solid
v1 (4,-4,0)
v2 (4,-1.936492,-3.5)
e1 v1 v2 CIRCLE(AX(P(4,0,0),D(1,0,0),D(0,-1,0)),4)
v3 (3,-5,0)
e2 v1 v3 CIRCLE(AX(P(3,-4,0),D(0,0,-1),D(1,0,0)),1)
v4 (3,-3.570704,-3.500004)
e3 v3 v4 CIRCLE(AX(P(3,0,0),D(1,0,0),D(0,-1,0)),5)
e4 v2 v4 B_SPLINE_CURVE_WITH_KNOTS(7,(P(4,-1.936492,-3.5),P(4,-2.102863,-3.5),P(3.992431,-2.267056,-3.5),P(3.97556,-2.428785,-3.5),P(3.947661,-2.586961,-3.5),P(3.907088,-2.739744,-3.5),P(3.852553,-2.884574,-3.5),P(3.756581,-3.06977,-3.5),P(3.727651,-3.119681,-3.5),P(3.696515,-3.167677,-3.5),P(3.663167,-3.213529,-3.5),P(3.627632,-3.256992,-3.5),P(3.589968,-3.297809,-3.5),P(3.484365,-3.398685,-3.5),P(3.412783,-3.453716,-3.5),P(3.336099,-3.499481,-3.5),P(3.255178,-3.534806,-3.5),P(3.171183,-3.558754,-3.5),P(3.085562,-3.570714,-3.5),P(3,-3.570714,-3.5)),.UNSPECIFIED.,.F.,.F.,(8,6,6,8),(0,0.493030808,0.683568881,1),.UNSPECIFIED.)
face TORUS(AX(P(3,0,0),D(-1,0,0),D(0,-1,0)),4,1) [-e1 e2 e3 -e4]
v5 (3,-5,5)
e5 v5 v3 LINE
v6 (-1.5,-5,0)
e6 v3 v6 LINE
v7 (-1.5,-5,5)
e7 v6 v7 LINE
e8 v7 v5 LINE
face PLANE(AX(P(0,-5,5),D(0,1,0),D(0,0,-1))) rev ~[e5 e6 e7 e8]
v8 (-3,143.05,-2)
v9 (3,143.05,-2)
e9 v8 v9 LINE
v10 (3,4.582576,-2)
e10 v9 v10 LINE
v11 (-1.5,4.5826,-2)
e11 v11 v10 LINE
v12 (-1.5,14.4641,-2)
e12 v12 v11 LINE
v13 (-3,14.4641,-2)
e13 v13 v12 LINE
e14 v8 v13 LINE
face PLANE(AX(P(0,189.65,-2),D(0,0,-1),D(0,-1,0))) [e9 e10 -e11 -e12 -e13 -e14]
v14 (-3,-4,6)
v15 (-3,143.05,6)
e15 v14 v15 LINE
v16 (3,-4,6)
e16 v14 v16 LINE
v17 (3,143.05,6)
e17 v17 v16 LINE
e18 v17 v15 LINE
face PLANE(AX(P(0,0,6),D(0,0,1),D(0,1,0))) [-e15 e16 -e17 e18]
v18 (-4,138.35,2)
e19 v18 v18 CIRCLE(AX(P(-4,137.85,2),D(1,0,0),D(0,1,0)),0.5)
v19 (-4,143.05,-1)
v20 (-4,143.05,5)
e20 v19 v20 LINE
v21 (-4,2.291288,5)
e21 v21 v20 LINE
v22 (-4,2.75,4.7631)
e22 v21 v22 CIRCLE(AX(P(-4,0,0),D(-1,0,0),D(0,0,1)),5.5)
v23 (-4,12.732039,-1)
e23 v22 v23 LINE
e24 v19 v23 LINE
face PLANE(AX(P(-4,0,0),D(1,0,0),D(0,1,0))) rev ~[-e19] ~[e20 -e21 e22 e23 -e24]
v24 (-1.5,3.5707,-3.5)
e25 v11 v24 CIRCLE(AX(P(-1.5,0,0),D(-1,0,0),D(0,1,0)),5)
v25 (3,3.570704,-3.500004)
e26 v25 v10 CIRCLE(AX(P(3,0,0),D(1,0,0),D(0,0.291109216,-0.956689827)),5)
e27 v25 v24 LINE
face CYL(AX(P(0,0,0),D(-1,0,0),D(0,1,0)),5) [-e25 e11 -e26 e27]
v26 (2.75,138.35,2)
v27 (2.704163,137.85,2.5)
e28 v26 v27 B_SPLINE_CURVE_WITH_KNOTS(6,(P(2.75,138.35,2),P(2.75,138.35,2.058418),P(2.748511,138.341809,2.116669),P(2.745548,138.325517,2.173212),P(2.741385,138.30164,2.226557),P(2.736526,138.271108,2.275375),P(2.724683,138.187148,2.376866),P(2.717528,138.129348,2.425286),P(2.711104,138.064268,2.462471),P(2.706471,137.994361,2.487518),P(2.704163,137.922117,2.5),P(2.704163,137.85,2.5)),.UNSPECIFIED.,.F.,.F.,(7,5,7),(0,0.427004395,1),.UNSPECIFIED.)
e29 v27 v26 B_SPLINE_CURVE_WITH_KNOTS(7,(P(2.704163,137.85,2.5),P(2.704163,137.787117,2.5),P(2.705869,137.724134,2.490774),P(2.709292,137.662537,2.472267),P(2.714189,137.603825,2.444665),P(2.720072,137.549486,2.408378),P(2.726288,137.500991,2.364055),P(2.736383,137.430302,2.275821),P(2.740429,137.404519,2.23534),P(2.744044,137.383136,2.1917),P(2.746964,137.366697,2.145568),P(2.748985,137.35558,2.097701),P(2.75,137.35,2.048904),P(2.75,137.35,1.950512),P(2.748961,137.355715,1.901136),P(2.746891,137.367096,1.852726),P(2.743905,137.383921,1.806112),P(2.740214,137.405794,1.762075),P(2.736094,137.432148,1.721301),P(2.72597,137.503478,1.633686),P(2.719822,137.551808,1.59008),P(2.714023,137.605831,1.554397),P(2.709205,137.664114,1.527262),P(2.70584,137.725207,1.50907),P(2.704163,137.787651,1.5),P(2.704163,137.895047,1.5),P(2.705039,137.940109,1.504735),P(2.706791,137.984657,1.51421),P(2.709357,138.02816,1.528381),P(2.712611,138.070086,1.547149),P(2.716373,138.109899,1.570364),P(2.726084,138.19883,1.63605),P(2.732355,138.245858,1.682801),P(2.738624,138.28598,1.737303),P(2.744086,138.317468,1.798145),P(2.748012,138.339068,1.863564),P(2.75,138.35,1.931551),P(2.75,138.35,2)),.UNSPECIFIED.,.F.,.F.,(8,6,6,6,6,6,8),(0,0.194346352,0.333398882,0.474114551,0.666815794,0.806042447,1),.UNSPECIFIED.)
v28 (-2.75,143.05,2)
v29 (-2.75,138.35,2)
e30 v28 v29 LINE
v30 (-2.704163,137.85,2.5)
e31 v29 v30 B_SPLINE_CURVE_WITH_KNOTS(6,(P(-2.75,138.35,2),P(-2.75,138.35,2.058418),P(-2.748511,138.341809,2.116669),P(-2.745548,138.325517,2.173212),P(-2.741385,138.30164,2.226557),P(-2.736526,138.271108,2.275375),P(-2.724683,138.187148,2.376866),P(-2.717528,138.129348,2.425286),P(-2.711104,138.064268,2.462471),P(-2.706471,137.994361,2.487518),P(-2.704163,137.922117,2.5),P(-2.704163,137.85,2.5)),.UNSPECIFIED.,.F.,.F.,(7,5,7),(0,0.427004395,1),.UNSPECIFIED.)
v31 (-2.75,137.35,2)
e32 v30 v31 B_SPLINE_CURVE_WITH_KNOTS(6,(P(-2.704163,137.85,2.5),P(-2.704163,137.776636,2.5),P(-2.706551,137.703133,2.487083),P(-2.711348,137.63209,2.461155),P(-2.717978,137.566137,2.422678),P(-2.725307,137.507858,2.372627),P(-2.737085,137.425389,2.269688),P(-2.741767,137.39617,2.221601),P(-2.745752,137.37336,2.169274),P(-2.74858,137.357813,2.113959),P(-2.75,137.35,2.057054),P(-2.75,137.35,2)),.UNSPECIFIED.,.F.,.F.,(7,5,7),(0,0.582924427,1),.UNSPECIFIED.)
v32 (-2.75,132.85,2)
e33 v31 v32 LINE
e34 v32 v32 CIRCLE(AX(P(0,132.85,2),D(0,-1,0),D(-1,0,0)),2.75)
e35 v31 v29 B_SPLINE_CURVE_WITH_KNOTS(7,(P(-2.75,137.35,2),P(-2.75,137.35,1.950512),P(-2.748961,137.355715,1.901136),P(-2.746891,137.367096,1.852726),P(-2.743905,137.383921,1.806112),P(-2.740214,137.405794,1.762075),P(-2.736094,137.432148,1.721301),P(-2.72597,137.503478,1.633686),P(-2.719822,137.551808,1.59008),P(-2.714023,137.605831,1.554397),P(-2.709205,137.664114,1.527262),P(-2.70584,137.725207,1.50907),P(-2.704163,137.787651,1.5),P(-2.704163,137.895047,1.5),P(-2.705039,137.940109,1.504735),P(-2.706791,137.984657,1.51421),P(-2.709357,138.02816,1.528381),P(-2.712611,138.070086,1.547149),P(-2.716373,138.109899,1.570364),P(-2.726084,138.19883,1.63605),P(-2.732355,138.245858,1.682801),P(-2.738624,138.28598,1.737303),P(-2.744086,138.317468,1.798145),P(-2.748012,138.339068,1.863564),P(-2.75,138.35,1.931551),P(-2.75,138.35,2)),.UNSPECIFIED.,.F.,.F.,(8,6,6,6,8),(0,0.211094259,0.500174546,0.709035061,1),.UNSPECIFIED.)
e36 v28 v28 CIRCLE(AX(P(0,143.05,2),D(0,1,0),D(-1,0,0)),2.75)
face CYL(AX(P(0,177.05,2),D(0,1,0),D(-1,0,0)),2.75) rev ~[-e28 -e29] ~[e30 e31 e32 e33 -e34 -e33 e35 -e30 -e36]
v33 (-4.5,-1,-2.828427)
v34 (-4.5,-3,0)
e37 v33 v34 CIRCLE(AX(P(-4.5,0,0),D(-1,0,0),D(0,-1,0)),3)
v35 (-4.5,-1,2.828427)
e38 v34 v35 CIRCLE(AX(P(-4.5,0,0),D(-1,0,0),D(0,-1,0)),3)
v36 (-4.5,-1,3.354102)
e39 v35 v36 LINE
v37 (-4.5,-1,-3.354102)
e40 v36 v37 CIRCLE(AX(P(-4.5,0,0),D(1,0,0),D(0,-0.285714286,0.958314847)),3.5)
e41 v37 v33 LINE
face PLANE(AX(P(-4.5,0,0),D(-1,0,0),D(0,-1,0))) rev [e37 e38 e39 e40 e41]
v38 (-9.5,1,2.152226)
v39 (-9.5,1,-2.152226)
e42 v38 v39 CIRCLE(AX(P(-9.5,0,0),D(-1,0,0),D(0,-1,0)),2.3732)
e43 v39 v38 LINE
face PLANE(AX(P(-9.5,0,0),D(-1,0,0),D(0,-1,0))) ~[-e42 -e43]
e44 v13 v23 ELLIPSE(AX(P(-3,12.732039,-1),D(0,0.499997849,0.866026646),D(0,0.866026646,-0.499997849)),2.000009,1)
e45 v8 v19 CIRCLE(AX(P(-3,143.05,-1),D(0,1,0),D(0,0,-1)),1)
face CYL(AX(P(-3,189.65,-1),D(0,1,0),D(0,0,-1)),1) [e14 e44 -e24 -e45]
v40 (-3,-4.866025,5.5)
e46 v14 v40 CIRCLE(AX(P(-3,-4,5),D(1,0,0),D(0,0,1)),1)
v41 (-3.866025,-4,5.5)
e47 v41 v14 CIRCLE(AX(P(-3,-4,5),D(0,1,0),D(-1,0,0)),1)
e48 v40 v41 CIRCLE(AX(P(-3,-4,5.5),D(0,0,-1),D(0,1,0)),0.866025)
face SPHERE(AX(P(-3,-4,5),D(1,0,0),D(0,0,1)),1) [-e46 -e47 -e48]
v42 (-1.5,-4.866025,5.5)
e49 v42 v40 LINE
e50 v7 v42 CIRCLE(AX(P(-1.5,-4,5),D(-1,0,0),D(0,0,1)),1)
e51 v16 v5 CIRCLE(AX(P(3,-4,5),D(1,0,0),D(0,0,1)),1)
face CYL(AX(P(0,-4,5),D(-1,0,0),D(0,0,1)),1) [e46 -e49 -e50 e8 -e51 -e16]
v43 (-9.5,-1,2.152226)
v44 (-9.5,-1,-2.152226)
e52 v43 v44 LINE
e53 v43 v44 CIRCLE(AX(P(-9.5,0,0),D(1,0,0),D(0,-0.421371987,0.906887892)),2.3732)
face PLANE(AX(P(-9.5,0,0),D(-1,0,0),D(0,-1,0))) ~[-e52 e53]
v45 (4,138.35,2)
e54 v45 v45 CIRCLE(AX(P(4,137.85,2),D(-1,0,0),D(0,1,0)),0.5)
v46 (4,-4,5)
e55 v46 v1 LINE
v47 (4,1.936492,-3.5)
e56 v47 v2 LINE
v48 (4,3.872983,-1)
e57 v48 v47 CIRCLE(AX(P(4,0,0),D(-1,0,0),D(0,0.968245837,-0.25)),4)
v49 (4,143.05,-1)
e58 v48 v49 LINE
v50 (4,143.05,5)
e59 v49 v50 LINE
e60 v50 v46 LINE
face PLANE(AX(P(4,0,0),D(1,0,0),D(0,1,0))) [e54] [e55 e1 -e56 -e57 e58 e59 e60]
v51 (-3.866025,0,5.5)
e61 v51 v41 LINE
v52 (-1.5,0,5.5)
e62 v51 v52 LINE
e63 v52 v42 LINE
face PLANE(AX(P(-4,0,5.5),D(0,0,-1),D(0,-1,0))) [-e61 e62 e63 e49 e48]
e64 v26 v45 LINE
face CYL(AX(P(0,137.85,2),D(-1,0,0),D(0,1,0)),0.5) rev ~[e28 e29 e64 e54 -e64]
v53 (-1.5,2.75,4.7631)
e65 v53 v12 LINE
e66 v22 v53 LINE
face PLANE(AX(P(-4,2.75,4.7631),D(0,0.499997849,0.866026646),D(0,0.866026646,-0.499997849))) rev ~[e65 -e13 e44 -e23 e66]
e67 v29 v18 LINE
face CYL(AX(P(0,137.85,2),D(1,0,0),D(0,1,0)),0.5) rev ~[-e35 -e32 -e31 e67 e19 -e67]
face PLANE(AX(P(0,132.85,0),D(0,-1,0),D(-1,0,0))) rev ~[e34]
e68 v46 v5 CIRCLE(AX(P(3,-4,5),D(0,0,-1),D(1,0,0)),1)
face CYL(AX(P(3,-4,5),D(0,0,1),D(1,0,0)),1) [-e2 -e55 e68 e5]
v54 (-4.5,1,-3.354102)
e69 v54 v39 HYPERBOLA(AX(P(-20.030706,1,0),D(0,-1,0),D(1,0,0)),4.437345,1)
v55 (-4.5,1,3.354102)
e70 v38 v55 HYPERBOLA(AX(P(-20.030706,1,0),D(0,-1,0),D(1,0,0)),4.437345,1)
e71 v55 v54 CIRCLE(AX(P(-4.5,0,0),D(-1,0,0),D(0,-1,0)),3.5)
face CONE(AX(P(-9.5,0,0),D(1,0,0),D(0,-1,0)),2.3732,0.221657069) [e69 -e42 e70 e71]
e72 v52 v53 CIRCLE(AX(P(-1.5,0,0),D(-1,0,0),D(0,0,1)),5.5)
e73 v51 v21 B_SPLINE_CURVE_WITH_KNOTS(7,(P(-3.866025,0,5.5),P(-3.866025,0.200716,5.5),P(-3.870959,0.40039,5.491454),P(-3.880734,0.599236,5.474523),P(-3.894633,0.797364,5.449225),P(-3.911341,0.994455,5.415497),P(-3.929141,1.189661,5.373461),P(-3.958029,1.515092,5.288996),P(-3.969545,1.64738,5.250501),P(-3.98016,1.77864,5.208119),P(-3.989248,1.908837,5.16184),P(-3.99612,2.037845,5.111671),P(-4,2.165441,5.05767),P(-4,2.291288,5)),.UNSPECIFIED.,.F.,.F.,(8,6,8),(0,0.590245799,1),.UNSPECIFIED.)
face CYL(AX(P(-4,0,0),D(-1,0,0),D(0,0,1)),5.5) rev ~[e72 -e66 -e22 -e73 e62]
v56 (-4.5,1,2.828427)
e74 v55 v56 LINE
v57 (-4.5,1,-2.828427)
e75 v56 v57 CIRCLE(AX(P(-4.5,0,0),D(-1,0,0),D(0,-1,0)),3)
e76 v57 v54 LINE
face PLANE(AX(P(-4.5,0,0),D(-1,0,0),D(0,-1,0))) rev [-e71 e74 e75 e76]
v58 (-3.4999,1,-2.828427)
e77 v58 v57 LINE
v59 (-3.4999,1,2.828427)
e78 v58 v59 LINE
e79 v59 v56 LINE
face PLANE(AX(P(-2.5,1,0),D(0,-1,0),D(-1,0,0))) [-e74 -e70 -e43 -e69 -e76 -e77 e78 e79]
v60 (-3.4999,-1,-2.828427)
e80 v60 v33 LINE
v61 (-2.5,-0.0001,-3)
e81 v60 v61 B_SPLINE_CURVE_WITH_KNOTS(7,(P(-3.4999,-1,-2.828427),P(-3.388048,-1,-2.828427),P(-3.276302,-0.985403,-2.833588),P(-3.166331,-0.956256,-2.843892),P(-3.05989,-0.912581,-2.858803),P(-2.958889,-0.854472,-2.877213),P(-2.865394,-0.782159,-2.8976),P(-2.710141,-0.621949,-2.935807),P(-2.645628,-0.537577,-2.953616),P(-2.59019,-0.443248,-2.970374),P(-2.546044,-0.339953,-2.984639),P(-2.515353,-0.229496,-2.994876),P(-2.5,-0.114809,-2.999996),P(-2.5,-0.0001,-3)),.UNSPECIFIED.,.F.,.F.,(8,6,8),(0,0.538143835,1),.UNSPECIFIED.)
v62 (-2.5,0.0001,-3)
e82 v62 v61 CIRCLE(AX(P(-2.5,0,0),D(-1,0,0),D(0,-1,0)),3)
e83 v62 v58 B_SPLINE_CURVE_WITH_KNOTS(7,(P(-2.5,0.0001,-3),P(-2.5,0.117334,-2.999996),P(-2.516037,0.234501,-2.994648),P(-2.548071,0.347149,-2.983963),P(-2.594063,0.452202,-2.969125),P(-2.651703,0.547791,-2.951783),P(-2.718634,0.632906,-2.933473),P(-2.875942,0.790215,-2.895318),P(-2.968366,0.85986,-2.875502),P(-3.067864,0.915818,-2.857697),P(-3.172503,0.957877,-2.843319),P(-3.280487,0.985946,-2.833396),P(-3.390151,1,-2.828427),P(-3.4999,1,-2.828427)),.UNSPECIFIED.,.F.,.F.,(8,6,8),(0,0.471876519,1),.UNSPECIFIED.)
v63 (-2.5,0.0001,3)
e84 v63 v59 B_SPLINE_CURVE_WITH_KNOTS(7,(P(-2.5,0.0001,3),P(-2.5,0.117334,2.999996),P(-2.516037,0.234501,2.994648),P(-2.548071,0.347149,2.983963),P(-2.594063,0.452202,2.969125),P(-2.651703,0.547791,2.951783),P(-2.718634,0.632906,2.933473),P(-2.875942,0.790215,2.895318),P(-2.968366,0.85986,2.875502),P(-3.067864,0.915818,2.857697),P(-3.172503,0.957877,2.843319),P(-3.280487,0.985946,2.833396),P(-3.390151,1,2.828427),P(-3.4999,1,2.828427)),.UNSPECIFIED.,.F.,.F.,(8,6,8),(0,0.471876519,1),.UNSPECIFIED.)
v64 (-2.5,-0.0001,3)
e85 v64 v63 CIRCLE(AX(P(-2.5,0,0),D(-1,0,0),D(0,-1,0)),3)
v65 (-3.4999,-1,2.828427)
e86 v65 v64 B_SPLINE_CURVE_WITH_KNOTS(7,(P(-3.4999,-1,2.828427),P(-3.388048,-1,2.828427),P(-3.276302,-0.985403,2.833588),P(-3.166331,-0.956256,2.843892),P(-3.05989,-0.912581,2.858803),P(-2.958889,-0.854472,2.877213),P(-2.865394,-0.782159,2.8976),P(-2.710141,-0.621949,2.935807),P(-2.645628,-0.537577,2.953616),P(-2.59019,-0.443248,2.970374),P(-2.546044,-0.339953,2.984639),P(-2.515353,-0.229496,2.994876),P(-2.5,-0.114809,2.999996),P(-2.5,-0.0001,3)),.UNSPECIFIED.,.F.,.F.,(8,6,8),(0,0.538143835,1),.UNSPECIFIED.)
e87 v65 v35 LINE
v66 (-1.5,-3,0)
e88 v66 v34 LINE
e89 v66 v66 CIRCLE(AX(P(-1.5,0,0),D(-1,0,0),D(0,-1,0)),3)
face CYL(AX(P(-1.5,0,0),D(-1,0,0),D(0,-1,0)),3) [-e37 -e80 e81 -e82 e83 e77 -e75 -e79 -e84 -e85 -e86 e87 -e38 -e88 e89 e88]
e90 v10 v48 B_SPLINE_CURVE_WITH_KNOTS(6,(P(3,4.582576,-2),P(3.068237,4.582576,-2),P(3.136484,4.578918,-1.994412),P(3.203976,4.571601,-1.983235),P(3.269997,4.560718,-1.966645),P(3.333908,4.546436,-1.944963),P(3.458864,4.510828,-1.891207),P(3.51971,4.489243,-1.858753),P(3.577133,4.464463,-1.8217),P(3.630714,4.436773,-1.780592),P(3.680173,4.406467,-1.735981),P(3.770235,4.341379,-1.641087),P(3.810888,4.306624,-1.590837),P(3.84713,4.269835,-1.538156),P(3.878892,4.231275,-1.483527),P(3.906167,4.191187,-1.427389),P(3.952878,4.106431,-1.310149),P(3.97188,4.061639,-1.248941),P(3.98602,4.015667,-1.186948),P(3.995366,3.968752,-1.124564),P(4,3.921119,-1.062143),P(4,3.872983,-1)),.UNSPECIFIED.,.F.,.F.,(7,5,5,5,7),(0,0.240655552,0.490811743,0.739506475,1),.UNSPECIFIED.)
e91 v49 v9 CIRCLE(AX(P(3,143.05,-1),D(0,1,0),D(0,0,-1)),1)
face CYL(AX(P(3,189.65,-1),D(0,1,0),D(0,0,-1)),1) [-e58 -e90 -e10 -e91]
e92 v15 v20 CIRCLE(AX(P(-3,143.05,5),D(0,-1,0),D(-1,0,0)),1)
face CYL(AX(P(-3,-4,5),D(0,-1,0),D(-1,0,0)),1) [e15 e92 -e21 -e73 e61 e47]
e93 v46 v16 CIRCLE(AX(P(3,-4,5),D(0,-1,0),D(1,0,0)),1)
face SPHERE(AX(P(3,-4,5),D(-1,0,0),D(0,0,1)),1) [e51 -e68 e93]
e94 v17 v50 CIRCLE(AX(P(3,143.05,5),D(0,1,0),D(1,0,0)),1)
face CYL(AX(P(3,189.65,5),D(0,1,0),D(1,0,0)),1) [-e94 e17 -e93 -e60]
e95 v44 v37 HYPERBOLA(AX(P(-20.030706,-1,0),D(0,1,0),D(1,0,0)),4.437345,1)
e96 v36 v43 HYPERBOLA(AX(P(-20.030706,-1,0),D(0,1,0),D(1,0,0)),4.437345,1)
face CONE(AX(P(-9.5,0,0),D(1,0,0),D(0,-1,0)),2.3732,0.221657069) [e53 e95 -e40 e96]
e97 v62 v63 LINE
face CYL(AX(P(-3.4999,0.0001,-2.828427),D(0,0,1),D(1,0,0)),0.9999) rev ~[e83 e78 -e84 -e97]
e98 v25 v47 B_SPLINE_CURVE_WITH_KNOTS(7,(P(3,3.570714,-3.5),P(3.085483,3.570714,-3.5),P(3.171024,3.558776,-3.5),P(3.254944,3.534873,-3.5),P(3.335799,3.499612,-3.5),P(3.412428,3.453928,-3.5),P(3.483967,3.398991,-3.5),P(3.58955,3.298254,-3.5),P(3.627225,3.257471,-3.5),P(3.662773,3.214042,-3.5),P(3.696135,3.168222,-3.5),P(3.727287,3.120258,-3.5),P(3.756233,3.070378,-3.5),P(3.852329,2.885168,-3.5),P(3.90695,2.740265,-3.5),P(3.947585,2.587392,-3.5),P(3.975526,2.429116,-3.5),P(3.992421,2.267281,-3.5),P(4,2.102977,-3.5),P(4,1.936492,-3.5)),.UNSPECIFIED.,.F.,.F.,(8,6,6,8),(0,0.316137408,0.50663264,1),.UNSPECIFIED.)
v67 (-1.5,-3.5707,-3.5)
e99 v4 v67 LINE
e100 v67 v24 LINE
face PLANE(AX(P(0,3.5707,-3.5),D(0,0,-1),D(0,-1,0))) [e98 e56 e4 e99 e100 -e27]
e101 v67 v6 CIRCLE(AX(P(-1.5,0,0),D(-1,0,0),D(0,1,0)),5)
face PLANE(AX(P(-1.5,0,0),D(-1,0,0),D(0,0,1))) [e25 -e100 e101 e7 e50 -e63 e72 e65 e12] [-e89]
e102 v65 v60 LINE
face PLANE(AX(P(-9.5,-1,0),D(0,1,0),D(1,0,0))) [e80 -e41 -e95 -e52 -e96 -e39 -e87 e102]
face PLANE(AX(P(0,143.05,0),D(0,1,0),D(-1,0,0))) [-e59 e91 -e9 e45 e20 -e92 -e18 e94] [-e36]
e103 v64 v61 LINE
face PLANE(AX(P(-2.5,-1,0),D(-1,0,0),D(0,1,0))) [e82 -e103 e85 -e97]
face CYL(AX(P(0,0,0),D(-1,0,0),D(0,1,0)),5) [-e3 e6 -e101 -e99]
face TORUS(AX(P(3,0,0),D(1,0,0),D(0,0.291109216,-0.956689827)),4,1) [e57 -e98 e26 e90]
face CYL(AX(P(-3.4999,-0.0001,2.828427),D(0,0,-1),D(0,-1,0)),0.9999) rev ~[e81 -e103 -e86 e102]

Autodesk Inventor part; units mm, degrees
ref_plane "YZ Plane" through (0, 0, 0) normal (1, 0, 0) x (0, 1, 0)
ref_plane "XY Plane" through (0, 0, 0) normal (0, 0, 1) x (1, 0, 0)
sketch "Boceto1" plane through (0, 0, 0) normal (1, 0, 0) x (0, 1, 0)
  circle A0 centre (0, 0) radius 5
  line L0 (0, 0) -> (0, 6)
  line L1 (0, 6) -> (-4, 6)
  line L2 (-5, 5) -> (-5, 0)
  line L3 (0, 6) -> (181.05, 6)
  line L4 (181.05, 6) -> (187.5, 6)
  line L5 (187.5, 6) -> (189.65, 6)
  line L6 (190.65, 5) -> (190.65, -1)
  line L7 (189.65, -2) -> (4.5826, -2)
  arc A1 (-4, 6) -> (-5, 5) centre (-4, 5) ccw
  arc A2 (190.65, 5) -> (189.65, 6) centre (189.65, 5) ccw
  arc A3 (189.65, -2) -> (190.65, -1) centre (189.65, -1) ccw
  line L8 (3.5707, -3.5) -> (-3.5707, -3.5)
  point P0 (-5, 6)
  point P1 (190.65, 6)
  point P2 (190.65, -2)
  dimension "d0" = 10
  dimension "d1" = 6
  dimension "d2" = 5
  dimension "d3" = 181.05
  dimension "d4" = 6.45
  dimension "d5" = 3.15
  dimension "d6" = 8
  dimension "d7" = 1
  dimension "d8" = 1
  dimension "d45" = 1.5
extrude "Extrusión1" add sketch "Boceto1" along normal mid plane 8 contours A0 L8 | L2 A1 L1 L0 A0 | L0 L3 L4 L5 A2 L6 A3 L7 A0 picked at (0, -0.6667)
fillet "Empalme1" radius 1 18 edges at (-4, 190.3571, 5.7071) (-4, 190.65, 2) (-4, 190.3571, -1.7071) (-4, 97.1163, -2) (-4, -4.7071, 5.7071) (-4, -5, 2.5) (-4, -4.6289, -1.8903) (-4, 4.1451, -2.7962) (-4, 92.825, 6) (4, -4.7071, 5.7071) (4, -5, 2.5) (4, -4.6289, -1.8903) (4, 4.1451, -2.7962) (4, 190.3571, 5.7071) (4, 190.65, 2) (4, 190.3571, -1.7071) (4, 97.1163, -2) (4, 92.825, 6)
sketch "Boceto2" plane through (-4, 0, 0) normal (-1, 0, 0) x (0, 0, 1)
  circle A0 centre (0, 0) radius 5.5
  line L0 (4.7631, 2.75) -> (-2, 14.4641)
  line L1 (-2, 189.65) -> (-2, 4.5826) projected
  line L2 (5.5, 0) -> (5.5, -5.5)
  line L3 (0, -5) -> (5, -5) projected
  line L4 (0, -5.5) -> (5.5, -5.5)
  line L5 (-2, 14.4641) -> (-2, 5.1235)
  dimension "d12" = 11
  dimension "d13" = 30
extrude "Extrusión2" cut sketch "Boceto2" against normal blind 2.5
sketch "Boceto3" plane through (0, 0, 0) normal (0, 0, 1) x (1, 0, 0)
  line L0 (-3, 190.65) -> (3, 190.65) projected
  line L1 (0, 190.65) -> (0, 181.05)
  line L2 (1.4, 190.65) -> (1.4, 181.05)
  line L3 (-1.4, 190.65) -> (-1.4, 181.05)
  line L4 (1.4, 190.65) -> (-1.4, 190.65)
  line L5 (0, 181.05) -> (1.4, 181.05)
  line L6 (0, 181.05) -> (-1.4, 181.05)
  point P0 (0, 0)
  dimension "d16" = 9.6
  dimension "d17" = 1.4
  dimension "d18" = 1.4
extrude "Extrusión3" cut sketch "Boceto3" along normal mid plane 16
fillet "Empalme4" radius 1 2 edges at (-1.4, 181.05, 2) (1.4, 181.05, 2)
sketch "Boceto11" plane through (0, 0, 0) normal (1, 0, 0) x (0, 1, 0)
  line L0 (0, 0) -> (0, 6)
  line L1 (0, 6) -> (181.05, 6)
  line L2 (189.65, 6) -> (-4, 6) projected
  line L3 (181.05, 6) -> (187.5, 6)
  line L4 (187.5, 6) -> (187.5, 0.55)
  circle A0 centre (187.5, 0.55) radius 1.15
  dimension "d66" = 6
  dimension "d67" = 181.05
  dimension "d68" = 6.45
  dimension "d69" = 5.45
  dimension "d70" = 2.3
extrude "Extrusión9" cut sketch "Boceto11" along normal through all both and the other way through all
sketch "Boceto6" plane through (0, 0, 0) normal (0, 0, 1) x (1, 0, 0)
  line L0 (0, 0) -> (-1.5, 0)
  line L1 (-1.5, 0) -> (-1.5, -3)
  line L2 (-1.5, -5) -> (-1.5, 4.5826) projected
  line L3 (-1.5, -3) -> (-4.5, -3)
  line L4 (-1.5, 0) -> (-9.5, 0)
  line L5 (-4.5, -3) -> (-4.5, -3.5)
  line L6 (-9.5, 0) -> (-9.5, -2.3732)
  line L7 (-9.5, -2.3732) -> (-4.5, -3.5)
  dimension "d27" = 1.5
  dimension "d28" = 3
  dimension "d29" = 3
  dimension "d30" = 8
  dimension "d31" = 0.5
  dimension "d32" = 2.3732
revolve "Revolución1" add sketch "Boceto6" angle 360 about axis through (-1.5, 0, 0) along (-1, 0, 0)
sketch "Boceto7" plane through (0, 0, 0) normal (0, 0, 1) x (1, 0, 0)
  line L0 (0, 0) -> (-1.5, 0)
  line L1 (-1.5, 0) -> (-4.5, 0)
  line L2 (-4.5, 0) -> (-9.5, 0)
  line L3 (-9.5, 0) -> (-9.5, -1)
  line L4 (-9.5, 2.3732) -> (-9.5, -2.3732) projected
  line L5 (-9.5, -1) -> (-2.5, -1)
  line L6 (-2.5, -1) -> (-2.5, 1)
  line L7 (-2.5, 1) -> (-9.5, 1)
  line L8 (-9.5, 1) -> (-9.5, 0)
  point P0 (-9.5, 1)
  dimension "d34" = 1.5
  dimension "d35" = 3
  dimension "d36" = 5
  dimension "d37" = 1
  dimension "d38" = 7
  dimension "d39" = 2
extrude "Extrusión5" cut sketch "Boceto7" along normal mid plane 7
fillet "Empalme2" radius 1 2 edges at (-2.5, -1, 0) (-2.5, 1, 0)
ref_plane "Plano de trabajo2" through (0, 177.05, 0) normal (0, 1, 0) x (-1, 0, 0)
sketch "Boceto8" plane through (0, 177.05, 0) normal (0, 1, 0) x (-1, 0, 0)
  line L0 (0, 0) -> (0, 2)
  line L1 (16, 18) -> (-16, 18)
  line L2 (-16, 18) -> (-16, -14)
  line L3 (-16, -14) -> (16, -14)
  line L4 (16, -14) -> (16, 18)
  line L5 (16, 18) -> (-16, -14) construction
  line L6 (-16, 18) -> (16, -14) construction
  point P0 (0, 0)
  dimension "d49" = 2
  dimension "d50" = 32
  dimension "d51" = 32
  dimension "d78" = 0
extrude "Extrusión6" cut sketch "Boceto8" against normal blind 34
sketch "Boceto9" plane through (0, 177.05, 0) normal (0, -1, 0) x (-1, 0, 0)
  line L0 (3, -6) -> (-3, -6) projected
  line L1 (0, 0) -> (0, -2)
  circle A0 centre (0, -2) radius 2.75
  point P0 (0, 0)
  point P1 (-2.6, -6)
  dimension "d55" = 2
  dimension "d56" = 5.5
  dimension "d79" = 0
  dimension "d80" = 0
extrude "Extrusión7" cut sketch "Boceto9" along normal blind 44.2
sketch "Boceto10" plane through (0, 177.05, 0) normal (0, -1, 0) x (-1, 0, 0)
  circle A0 centre (0, -2) radius 2.6 projected
  circle A1 centre (0, -2) radius 3
  point P0 (0, 0)
  dimension "d59" = 6
extrude "Extrusión8" [suppressed]
fillet "Empalme3" [suppressed]
sketch "Boceto13" plane through (0, 143.05, 0) normal (0, 1, 0) x (1, 0, 0)
  line L0 (16, -16) -> (-16, -16)
  line L1 (-16, -16) -> (-16, 16)
  line L2 (-16, 16) -> (16, 16)
  line L3 (16, 16) -> (16, -16)
  line L4 (16, -16) -> (-16, 16) construction
  line L5 (-16, -16) -> (16, 16) construction
  point P0 (0, 0)
  dimension "d81" = 32
  dimension "d82" = 32
extrude "Extrusión10" cut sketch "Boceto13" along normal blind 181.05
sketch "Boceto14" plane through (0, 0, 0) normal (1, 0, 0) x (0, 1, 0)
  line L0 (0, 0) -> (0, 6)
  line L1 (0, 6) -> (137.85, 6)
  line L2 (137.85, 6) -> (137.85, 2)
  circle A0 centre (137.85, 2) radius 0.5
  dimension "d85" = 6
  dimension "d86" = 137.85
  dimension "d87" = 4
  dimension "d88" = 1
extrude "Extrusión11" cut sketch "Boceto14" along normal through all both and the other way through all
equation "\"d0\" = width_r3"
equation "\"d1\" = 0.5 * width_r3 + offset"
equation "\"d2\" = 0.5 * width_r3"
equation "\"d3\" = lenght_body_link - 0.5 * width_r3"
equation "\"d4\" = shaft_y"
equation "\"d5\" = 0.5 * Djoint_shaft + 2 * offset"
equation "\"d6\" = width_link"
equation "\"d45\" = 1.5 * offset"
equation "\"d9\" = width_link"
equation "\"d12\" = width_r3 + offset"
equation "\"d14\" = 0.5 * width_link - 0.5 * t_thikness"
equation "\"d16\" = 0.5 * Djoint_shaft + 2 * offset + shaft_y"
equation "\"d17\" = 0.25 * offset + 0.5 * wire_D"
equation "\"d18\" = 0.25 * offset + 0.5 * wire_D"
equation "\"d19\" = 2 * width_link"
equation "\"d63\" = offset"
equation "\"d27\" = 0.5 * t_thikness"
equation "\"d28\" = 0.5 * sj_diam_shaft"
equation "\"d29\" = t_thikness"
equation "\"d30\" = t_thikness + sj_head_height"
equation "\"d31\" = 0.5 * sj_head_D - 0.5 * sj_diam_shaft"
equation "\"d32\" = 0.5 * sj_head_d"
equation "\"d34\" = 0.5 * t_thikness"
equation "\"d35\" = t_thikness"
equation "\"d36\" = sj_head_height"
equation "\"d37\" = 0.5 * sj_groove"
equation "\"d38\" = sj_groove_deep"
equation "\"d39\" = sj_groove"
equation "\"d40\" = sj_head_D"
equation "\"d46\" = 0.5 * sj_groove"
equation "\"d52\" = spring_lenght + 3 * thikness"
equation "\"d59\" = spring_int_d"
equation "\"d60\" = thikness"
equation "\"d62\" = offset"
equation "\"offset\" = 1"
equation "\"wire_D\" = 2.3"
equation "\"width_link\" = 8"
equation "\"Djoint_shaft\" = 2.3"
equation "\"shaft_x\" = 1.45"
equation "\"shaft_y\" = 6.45"
equation "\"lenght_body_link\" = 186.05"
equation "\"m2_theta3f\" = -60deg"
equation "\"width_r3\" = 10"
equation "\"t_thikness\" = 3"
equation "\"sj_diam_shaft\" = 6"
equation "\"sj_groove\" = 2"
equation "\"sj_groove_deep\" = 7"
equation "\"sj_head_D\" = 7"
equation "\"sj_head_d\" = 4.7464"
equation "\"sj_head_height\" = 5"
equation "\"thikness\" = 2"
equation "\"spring_int_d\" = 6"
equation "\"spring_lenght\" = 28"
equation "\"r1\" = 5.55"
equation "\"r2o\" = 59.75"
equation "\"delta_y\" = 6"
equation "\"wire_d\" = 1"
equation "\"width_ang_spring\" = 5"
equation "\"spring_int_diam\" = 8.5"
equation "\"spring_ext_diam\" = 10.5"
equation "\"r3\" = 8.25"
equation "\"r3R\" = 4.75"
equation "\"r3T\" = 6.74537"
equation "\"alpha\" = 54.847297deg"
equation "\"alpha2\" = 270deg"
equation "\"theta3_recogido\" = 305.152703deg"
equation "\"delta_theta_3\" = 45deg"
equation "\"joint_width\" = 12"
equation "\"joint_radius\" = 7.75"
equation "\"shaft_width\" = 15"
equation "\"shaft_joint_diameter\" = 7.75"
equation "\"separation_space\" = 0.5"
equation "\"height_finger\" = 42"
equation "\"cell_screw_head_diameter\" = 4"
equation "\"cell_screw_diameter\" = 2"
equation "\"cell_space\" = 2"
equation "\"cell_width\" = 6"
equation "\"cell_theta_position\" = 60deg"
equation "\"cell_thikness\" = 1"
equation "\"cell_lenght\" = 37"
equation "\"cell_z_space\" = 5"
equation "\"Dt\" = 1.05949"
equation "\"lenght_bar_support\" = 201.65"
equation "\"wire_spring_d\" = 1"
equation "\"trigger_offset\" = 2"
equation "\"m2_theta2o\" = 107deg"
equation "\"m2_r2\" = 28"
equation "\"e\" = 9"
equation "\"So\" = 17"
equation "\"m2_theta3o\" = -30deg"
equation "\"m2_r3\" = 19.75"
equation "\"m2_delta_theta1\" = 15deg"
equation "\"trigger_thumb_lenght\" = 6"
equation "\"width_r12\" = 8"
equation "\"m2_r1\" = 25.2"
equation "\"r3_thikness\" = 3.5"
equation "\"tg_width\" = 4"
equation "\"pivot_screw_d\" = 4"
equation "\"pivot_diameter\" = 7"
equation "\"sf_lenght\" = 9.5"
equation "\"sf_base\" = 3"
equation "\"sf_head_height\" = 3"
equation "\"sf_head_width\" = 4.5"
equation "\"sf_head_offset\" = 0.25"
equation "\"sf_head_grip_width\" = 2"
equation "\"sf_head_angle\" = 45deg"
equation "\"sf_thikness\" = 5"
equation "\"screw_Dhead\" = 8"
equation "\"screw_d\" = 4"
equation "\"screw_lenght\" = 12"
equation "\"screwJ_base_D\" = 9"
equation "\"screwJ_top_D\" = 13"
equation "\"gj_D\" = 6"
equation "\"gj_d\" = 4"
equation "\"gj_out_section\" = 6"
equation "\"agarradera_theta\" = 60deg"
equation "\"agarradera_width\" = 4"
equation "\"sfbox_theta1\" = 60deg"
equation "\"sfbox_theta2\" = 45deg"
equation "\"position\" = 39.13077"
equation "\"fat_width_slider\" = 2"
equation "\"sfbox_tip_width\" = 2.5"
equation "\"flex_separation_theta\" = 60deg"
equation "\"sf_flex_separation\" = 38.66667"
equation "\"ext_width_slider\" = 3.5"
equation "\"sf_box_width\" = 1.5"
equation "\"slim_width_slider\" = 1.5"
equation "\"sfbox_width\" = 1.5"
equation "\"int_width_slider\" = 2"
equation "\"box_fat_slider_lenght\" = 67"
equation "\"box_slim_slider_lenght\" = 116"
equation "\"thikness_box\" = 1.5"
equation "\"box_in_height\" = 35"
equation "\"box_in_width\" = 72"
equation "\"box_in_deep\" = 77"
equation "\"agarradera_position\" = 82.13077"
properties part number "Eslabón conector M2" material "Plástico PPS"
